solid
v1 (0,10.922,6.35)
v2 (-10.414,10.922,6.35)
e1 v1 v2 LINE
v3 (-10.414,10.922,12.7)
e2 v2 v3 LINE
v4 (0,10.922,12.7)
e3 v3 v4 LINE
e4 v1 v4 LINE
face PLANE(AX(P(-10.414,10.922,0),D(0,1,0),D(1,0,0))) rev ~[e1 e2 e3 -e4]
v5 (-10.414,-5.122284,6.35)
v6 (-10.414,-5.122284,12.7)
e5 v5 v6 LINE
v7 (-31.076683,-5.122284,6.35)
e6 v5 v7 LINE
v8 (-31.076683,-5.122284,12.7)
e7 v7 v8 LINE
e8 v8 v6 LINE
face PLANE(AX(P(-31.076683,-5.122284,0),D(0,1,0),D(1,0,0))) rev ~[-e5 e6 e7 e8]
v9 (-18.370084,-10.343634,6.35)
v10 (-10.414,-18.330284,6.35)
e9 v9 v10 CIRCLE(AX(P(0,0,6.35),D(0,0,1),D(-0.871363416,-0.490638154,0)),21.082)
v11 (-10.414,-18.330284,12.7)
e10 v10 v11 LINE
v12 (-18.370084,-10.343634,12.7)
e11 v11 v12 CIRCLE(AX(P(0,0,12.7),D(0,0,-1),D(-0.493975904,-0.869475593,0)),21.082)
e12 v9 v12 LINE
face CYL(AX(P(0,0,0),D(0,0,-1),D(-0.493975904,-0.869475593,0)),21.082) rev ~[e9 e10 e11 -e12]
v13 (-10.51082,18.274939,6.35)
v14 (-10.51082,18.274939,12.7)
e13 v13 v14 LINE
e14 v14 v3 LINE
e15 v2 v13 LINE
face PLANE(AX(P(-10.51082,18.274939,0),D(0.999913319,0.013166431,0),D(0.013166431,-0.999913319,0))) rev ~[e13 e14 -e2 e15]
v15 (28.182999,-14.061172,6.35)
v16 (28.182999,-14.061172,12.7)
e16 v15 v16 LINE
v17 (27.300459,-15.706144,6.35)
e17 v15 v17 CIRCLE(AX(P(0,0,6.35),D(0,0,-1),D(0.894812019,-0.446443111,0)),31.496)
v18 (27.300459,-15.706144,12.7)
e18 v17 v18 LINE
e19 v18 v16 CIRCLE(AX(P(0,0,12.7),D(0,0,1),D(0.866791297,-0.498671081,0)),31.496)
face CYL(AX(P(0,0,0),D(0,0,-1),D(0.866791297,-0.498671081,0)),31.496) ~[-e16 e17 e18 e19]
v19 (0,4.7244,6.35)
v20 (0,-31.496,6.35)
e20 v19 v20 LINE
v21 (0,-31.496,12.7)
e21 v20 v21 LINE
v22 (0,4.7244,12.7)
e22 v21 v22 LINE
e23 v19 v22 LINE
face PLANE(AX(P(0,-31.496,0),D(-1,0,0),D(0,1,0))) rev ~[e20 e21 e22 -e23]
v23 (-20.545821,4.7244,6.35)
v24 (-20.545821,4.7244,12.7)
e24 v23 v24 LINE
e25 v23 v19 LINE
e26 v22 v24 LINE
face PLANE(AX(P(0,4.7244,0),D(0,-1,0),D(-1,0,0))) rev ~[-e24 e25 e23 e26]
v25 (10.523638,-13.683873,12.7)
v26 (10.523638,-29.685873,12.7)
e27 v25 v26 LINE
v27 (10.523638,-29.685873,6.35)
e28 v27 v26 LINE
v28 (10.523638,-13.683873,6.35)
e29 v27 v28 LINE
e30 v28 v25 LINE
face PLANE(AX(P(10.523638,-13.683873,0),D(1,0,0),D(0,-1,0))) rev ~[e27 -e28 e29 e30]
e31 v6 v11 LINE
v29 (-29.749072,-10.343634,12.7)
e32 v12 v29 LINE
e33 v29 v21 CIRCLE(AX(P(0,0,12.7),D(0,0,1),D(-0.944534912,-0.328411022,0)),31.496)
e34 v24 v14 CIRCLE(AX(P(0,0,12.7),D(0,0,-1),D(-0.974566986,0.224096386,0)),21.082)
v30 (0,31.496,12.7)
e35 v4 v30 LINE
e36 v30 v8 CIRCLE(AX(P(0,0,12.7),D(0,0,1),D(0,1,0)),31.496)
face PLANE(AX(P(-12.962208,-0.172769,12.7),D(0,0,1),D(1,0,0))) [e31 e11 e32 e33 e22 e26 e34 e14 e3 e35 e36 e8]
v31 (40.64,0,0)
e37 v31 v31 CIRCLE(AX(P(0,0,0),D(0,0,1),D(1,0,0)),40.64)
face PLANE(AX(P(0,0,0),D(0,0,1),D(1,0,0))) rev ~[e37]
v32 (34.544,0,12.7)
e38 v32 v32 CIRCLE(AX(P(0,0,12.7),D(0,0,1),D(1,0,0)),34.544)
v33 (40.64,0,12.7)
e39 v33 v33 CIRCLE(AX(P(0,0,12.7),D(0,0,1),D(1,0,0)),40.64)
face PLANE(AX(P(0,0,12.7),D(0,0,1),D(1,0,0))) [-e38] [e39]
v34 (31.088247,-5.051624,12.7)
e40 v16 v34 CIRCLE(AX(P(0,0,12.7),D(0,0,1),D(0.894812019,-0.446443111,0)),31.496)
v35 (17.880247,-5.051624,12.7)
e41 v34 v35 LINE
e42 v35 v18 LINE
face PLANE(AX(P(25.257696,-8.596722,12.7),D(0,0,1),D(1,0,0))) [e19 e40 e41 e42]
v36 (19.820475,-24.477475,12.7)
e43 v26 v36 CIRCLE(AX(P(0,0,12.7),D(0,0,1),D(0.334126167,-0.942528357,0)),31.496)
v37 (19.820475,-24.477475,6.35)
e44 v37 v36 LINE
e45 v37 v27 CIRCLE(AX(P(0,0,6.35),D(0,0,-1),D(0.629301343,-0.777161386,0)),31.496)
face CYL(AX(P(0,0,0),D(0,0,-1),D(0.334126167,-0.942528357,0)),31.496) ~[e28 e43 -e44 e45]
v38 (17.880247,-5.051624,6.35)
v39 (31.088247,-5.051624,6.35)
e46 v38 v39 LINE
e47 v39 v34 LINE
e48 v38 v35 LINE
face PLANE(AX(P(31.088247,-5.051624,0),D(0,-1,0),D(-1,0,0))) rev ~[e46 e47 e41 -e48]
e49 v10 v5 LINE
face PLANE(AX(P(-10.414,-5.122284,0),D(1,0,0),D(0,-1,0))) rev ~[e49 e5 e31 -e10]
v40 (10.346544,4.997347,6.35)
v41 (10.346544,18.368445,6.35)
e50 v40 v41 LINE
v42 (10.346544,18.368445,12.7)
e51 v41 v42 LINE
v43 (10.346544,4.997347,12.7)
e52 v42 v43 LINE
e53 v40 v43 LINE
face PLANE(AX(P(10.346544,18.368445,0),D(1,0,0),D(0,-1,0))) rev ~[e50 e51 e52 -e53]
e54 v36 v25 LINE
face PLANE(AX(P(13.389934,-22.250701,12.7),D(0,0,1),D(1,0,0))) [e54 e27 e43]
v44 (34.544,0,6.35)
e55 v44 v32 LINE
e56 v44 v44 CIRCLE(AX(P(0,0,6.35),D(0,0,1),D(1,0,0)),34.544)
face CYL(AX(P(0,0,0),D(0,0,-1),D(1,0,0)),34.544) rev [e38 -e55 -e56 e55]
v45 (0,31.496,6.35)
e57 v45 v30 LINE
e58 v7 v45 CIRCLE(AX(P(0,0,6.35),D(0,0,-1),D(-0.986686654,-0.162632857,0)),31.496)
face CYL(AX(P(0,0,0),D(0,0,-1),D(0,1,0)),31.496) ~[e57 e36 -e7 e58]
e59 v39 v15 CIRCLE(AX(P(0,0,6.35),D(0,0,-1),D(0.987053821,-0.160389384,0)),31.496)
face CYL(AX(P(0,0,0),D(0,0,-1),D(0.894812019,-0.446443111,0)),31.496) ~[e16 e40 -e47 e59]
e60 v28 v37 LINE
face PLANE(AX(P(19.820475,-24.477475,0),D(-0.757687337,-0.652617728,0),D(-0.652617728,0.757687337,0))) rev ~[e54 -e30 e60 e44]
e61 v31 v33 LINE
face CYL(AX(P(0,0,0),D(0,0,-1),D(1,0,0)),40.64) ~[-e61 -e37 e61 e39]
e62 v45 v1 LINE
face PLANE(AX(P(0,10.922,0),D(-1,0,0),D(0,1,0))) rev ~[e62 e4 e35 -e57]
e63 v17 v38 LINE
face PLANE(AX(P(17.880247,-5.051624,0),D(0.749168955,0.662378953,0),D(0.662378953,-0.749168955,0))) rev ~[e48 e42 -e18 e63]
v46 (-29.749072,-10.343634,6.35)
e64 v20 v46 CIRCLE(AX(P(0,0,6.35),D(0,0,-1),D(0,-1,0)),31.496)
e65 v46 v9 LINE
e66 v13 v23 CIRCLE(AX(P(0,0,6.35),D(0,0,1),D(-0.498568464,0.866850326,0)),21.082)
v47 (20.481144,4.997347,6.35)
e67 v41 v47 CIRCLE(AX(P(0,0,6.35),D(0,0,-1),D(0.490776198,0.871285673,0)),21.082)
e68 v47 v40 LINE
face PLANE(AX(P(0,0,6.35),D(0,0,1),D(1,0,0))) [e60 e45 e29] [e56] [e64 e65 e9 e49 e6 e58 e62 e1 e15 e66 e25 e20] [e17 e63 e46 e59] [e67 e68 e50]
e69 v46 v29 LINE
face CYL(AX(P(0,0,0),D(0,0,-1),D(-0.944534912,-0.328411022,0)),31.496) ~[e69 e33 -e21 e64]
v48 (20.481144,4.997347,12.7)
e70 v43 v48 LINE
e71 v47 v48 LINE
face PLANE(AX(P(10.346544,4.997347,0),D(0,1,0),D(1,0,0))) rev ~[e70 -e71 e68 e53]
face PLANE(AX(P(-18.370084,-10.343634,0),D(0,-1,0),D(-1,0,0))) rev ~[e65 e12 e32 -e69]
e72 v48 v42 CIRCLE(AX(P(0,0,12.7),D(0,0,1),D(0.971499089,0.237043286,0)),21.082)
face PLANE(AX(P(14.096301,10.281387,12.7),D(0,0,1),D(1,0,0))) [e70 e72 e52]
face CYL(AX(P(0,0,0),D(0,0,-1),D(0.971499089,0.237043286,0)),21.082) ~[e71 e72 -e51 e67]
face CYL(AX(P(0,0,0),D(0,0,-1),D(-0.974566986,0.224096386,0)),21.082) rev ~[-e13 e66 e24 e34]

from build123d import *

# Parameters (mm, degrees)
F0_R     = 34.544
F1_DEPTH = 6.35
F0_R_2   = 40.64
F2_DEPTH = 12.7


with BuildPart() as f1:
    # F0 (on Top) → F1 (new body)
    with BuildSketch(Plane.XY):
        Circle(F0_R)
        with BuildLine():
            ThreePointArc((-31.076682867, -5.1222844495), (-24.0138448298, 20.3797269974), (0, 31.496))
            Line((0, 31.496), (0, 10.922))
            Line((0, 10.922), (-10.414, 10.922))
            Line((-10.414, 10.922), (-10.5108203487, 18.2749385662))
            ThreePointArc((-10.5108203487, 18.2749385662), (-16.9420488689, 12.5466212234), (-20.5458211965, 4.7244))
            Line((-20.5458211965, 4.7244), (0, 4.7244))
            Line((0, 4.7244), (0, -31.496))
            ThreePointArc((0, -31.496), (-18.2512319231, -25.6688634203), (-29.7490715955, -10.3436335592))
            Line((-29.7490715955, -10.3436335592), (-18.3700835271, -10.3436335592))
            ThreePointArc((-18.3700835271, -10.3436335592), (-14.9357796661, -14.8786158552), (-10.414, -18.3302844495))
            Line((-10.414, -18.3302844495), (-10.414, -5.1222844495))
            Line((-10.414, -5.1222844495), (-31.076682867, -5.1222844495))
        make_face(mode=Mode.SUBTRACT)
        with BuildLine():
            ThreePointArc((19.8204750869, -24.4774750195), (15.3939322044, -27.477715831), (10.523637749, -29.6858731475))
            Line((10.523637749, -29.6858731475), (10.523637749, -13.6838731475))
            Line((10.523637749, -13.6838731475), (19.8204750869, -24.4774750195))
        make_face(mode=Mode.SUBTRACT)
        with BuildLine():
            ThreePointArc((31.0882471472, -5.0516240273), (29.9760430145, -9.6661709684), (28.1829993455, -14.0611722091))
            ThreePointArc((28.1829993455, -14.0611722091), (27.753918864, -14.8901982421), (27.3004586922, -15.7061443772))
            Line((27.3004586922, -15.7061443772), (17.8802471472, -5.0516240273))
            Line((17.8802471472, -5.0516240273), (31.0882471472, -5.0516240273))
        make_face(mode=Mode.SUBTRACT)
        with BuildLine():
            ThreePointArc((10.3465438025, 18.3684445543), (16.8012840648, 12.7345034365), (20.4811438025, 4.9973465502))
            Line((20.4811438025, 4.9973465502), (10.3465438025, 4.9973465502))
            Line((10.3465438025, 4.9973465502), (10.3465438025, 18.3684445543))
        make_face(mode=Mode.SUBTRACT)
    extrude(amount=F1_DEPTH)

    # F0 (on Top) → F2 (join)
    with BuildSketch(Plane.XY):
        Circle(F0_R_2)
        Circle(F0_R, mode=Mode.SUBTRACT)
        with BuildLine():
            Line((0, 10.922), (0, 31.496))
            ThreePointArc((0, 31.496), (-24.0138448298, 20.3797269974), (-31.076682867, -5.1222844495))
            Line((-31.076682867, -5.1222844495), (-10.414, -5.1222844495))
            Line((-10.414, -5.1222844495), (-10.414, -18.3302844495))
            ThreePointArc((-10.414, -18.3302844495), (-14.9357796661, -14.8786158552), (-18.3700835271, -10.3436335592))
            Line((-18.3700835271, -10.3436335592), (-29.7490715955, -10.3436335592))
            ThreePointArc((-29.7490715955, -10.3436335592), (-18.2512319231, -25.6688634203), (0, -31.496))
            Line((0, -31.496), (0, 4.7244))
            Line((0, 4.7244), (-20.5458211965, 4.7244))
            ThreePointArc((-20.5458211965, 4.7244), (-16.9420488689, 12.5466212234), (-10.5108203487, 18.2749385662))
            Line((-10.5108203487, 18.2749385662), (-10.414, 10.922))
            Line((-10.414, 10.922), (0, 10.922))
        make_face()
        with BuildLine():
            Line((10.3465438025, 4.9973465502), (20.4811438025, 4.9973465502))
            ThreePointArc((20.4811438025, 4.9973465502), (16.8012840648, 12.7345034365), (10.3465438025, 18.3684445543))
            Line((10.3465438025, 18.3684445543), (10.3465438025, 4.9973465502))
        make_face()
        with BuildLine():
            Line((10.523637749, -13.6838731475), (10.523637749, -29.6858731475))
            ThreePointArc((10.523637749, -29.6858731475), (15.3939322044, -27.477715831), (19.8204750869, -24.4774750195))
            Line((19.8204750869, -24.4774750195), (10.523637749, -13.6838731475))
        make_face()
        with BuildLine():
            ThreePointArc((27.3004586922, -15.7061443772), (27.753918864, -14.8901982421), (28.1829993455, -14.0611722091))
            ThreePointArc((28.1829993455, -14.0611722091), (29.9760430145, -9.6661709684), (31.0882471472, -5.0516240273))
            Line((31.0882471472, -5.0516240273), (17.8802471472, -5.0516240273))
            Line((17.8802471472, -5.0516240273), (27.3004586922, -15.7061443772))
        make_face()
    extrude(amount=F2_DEPTH)


solid = f1.part
